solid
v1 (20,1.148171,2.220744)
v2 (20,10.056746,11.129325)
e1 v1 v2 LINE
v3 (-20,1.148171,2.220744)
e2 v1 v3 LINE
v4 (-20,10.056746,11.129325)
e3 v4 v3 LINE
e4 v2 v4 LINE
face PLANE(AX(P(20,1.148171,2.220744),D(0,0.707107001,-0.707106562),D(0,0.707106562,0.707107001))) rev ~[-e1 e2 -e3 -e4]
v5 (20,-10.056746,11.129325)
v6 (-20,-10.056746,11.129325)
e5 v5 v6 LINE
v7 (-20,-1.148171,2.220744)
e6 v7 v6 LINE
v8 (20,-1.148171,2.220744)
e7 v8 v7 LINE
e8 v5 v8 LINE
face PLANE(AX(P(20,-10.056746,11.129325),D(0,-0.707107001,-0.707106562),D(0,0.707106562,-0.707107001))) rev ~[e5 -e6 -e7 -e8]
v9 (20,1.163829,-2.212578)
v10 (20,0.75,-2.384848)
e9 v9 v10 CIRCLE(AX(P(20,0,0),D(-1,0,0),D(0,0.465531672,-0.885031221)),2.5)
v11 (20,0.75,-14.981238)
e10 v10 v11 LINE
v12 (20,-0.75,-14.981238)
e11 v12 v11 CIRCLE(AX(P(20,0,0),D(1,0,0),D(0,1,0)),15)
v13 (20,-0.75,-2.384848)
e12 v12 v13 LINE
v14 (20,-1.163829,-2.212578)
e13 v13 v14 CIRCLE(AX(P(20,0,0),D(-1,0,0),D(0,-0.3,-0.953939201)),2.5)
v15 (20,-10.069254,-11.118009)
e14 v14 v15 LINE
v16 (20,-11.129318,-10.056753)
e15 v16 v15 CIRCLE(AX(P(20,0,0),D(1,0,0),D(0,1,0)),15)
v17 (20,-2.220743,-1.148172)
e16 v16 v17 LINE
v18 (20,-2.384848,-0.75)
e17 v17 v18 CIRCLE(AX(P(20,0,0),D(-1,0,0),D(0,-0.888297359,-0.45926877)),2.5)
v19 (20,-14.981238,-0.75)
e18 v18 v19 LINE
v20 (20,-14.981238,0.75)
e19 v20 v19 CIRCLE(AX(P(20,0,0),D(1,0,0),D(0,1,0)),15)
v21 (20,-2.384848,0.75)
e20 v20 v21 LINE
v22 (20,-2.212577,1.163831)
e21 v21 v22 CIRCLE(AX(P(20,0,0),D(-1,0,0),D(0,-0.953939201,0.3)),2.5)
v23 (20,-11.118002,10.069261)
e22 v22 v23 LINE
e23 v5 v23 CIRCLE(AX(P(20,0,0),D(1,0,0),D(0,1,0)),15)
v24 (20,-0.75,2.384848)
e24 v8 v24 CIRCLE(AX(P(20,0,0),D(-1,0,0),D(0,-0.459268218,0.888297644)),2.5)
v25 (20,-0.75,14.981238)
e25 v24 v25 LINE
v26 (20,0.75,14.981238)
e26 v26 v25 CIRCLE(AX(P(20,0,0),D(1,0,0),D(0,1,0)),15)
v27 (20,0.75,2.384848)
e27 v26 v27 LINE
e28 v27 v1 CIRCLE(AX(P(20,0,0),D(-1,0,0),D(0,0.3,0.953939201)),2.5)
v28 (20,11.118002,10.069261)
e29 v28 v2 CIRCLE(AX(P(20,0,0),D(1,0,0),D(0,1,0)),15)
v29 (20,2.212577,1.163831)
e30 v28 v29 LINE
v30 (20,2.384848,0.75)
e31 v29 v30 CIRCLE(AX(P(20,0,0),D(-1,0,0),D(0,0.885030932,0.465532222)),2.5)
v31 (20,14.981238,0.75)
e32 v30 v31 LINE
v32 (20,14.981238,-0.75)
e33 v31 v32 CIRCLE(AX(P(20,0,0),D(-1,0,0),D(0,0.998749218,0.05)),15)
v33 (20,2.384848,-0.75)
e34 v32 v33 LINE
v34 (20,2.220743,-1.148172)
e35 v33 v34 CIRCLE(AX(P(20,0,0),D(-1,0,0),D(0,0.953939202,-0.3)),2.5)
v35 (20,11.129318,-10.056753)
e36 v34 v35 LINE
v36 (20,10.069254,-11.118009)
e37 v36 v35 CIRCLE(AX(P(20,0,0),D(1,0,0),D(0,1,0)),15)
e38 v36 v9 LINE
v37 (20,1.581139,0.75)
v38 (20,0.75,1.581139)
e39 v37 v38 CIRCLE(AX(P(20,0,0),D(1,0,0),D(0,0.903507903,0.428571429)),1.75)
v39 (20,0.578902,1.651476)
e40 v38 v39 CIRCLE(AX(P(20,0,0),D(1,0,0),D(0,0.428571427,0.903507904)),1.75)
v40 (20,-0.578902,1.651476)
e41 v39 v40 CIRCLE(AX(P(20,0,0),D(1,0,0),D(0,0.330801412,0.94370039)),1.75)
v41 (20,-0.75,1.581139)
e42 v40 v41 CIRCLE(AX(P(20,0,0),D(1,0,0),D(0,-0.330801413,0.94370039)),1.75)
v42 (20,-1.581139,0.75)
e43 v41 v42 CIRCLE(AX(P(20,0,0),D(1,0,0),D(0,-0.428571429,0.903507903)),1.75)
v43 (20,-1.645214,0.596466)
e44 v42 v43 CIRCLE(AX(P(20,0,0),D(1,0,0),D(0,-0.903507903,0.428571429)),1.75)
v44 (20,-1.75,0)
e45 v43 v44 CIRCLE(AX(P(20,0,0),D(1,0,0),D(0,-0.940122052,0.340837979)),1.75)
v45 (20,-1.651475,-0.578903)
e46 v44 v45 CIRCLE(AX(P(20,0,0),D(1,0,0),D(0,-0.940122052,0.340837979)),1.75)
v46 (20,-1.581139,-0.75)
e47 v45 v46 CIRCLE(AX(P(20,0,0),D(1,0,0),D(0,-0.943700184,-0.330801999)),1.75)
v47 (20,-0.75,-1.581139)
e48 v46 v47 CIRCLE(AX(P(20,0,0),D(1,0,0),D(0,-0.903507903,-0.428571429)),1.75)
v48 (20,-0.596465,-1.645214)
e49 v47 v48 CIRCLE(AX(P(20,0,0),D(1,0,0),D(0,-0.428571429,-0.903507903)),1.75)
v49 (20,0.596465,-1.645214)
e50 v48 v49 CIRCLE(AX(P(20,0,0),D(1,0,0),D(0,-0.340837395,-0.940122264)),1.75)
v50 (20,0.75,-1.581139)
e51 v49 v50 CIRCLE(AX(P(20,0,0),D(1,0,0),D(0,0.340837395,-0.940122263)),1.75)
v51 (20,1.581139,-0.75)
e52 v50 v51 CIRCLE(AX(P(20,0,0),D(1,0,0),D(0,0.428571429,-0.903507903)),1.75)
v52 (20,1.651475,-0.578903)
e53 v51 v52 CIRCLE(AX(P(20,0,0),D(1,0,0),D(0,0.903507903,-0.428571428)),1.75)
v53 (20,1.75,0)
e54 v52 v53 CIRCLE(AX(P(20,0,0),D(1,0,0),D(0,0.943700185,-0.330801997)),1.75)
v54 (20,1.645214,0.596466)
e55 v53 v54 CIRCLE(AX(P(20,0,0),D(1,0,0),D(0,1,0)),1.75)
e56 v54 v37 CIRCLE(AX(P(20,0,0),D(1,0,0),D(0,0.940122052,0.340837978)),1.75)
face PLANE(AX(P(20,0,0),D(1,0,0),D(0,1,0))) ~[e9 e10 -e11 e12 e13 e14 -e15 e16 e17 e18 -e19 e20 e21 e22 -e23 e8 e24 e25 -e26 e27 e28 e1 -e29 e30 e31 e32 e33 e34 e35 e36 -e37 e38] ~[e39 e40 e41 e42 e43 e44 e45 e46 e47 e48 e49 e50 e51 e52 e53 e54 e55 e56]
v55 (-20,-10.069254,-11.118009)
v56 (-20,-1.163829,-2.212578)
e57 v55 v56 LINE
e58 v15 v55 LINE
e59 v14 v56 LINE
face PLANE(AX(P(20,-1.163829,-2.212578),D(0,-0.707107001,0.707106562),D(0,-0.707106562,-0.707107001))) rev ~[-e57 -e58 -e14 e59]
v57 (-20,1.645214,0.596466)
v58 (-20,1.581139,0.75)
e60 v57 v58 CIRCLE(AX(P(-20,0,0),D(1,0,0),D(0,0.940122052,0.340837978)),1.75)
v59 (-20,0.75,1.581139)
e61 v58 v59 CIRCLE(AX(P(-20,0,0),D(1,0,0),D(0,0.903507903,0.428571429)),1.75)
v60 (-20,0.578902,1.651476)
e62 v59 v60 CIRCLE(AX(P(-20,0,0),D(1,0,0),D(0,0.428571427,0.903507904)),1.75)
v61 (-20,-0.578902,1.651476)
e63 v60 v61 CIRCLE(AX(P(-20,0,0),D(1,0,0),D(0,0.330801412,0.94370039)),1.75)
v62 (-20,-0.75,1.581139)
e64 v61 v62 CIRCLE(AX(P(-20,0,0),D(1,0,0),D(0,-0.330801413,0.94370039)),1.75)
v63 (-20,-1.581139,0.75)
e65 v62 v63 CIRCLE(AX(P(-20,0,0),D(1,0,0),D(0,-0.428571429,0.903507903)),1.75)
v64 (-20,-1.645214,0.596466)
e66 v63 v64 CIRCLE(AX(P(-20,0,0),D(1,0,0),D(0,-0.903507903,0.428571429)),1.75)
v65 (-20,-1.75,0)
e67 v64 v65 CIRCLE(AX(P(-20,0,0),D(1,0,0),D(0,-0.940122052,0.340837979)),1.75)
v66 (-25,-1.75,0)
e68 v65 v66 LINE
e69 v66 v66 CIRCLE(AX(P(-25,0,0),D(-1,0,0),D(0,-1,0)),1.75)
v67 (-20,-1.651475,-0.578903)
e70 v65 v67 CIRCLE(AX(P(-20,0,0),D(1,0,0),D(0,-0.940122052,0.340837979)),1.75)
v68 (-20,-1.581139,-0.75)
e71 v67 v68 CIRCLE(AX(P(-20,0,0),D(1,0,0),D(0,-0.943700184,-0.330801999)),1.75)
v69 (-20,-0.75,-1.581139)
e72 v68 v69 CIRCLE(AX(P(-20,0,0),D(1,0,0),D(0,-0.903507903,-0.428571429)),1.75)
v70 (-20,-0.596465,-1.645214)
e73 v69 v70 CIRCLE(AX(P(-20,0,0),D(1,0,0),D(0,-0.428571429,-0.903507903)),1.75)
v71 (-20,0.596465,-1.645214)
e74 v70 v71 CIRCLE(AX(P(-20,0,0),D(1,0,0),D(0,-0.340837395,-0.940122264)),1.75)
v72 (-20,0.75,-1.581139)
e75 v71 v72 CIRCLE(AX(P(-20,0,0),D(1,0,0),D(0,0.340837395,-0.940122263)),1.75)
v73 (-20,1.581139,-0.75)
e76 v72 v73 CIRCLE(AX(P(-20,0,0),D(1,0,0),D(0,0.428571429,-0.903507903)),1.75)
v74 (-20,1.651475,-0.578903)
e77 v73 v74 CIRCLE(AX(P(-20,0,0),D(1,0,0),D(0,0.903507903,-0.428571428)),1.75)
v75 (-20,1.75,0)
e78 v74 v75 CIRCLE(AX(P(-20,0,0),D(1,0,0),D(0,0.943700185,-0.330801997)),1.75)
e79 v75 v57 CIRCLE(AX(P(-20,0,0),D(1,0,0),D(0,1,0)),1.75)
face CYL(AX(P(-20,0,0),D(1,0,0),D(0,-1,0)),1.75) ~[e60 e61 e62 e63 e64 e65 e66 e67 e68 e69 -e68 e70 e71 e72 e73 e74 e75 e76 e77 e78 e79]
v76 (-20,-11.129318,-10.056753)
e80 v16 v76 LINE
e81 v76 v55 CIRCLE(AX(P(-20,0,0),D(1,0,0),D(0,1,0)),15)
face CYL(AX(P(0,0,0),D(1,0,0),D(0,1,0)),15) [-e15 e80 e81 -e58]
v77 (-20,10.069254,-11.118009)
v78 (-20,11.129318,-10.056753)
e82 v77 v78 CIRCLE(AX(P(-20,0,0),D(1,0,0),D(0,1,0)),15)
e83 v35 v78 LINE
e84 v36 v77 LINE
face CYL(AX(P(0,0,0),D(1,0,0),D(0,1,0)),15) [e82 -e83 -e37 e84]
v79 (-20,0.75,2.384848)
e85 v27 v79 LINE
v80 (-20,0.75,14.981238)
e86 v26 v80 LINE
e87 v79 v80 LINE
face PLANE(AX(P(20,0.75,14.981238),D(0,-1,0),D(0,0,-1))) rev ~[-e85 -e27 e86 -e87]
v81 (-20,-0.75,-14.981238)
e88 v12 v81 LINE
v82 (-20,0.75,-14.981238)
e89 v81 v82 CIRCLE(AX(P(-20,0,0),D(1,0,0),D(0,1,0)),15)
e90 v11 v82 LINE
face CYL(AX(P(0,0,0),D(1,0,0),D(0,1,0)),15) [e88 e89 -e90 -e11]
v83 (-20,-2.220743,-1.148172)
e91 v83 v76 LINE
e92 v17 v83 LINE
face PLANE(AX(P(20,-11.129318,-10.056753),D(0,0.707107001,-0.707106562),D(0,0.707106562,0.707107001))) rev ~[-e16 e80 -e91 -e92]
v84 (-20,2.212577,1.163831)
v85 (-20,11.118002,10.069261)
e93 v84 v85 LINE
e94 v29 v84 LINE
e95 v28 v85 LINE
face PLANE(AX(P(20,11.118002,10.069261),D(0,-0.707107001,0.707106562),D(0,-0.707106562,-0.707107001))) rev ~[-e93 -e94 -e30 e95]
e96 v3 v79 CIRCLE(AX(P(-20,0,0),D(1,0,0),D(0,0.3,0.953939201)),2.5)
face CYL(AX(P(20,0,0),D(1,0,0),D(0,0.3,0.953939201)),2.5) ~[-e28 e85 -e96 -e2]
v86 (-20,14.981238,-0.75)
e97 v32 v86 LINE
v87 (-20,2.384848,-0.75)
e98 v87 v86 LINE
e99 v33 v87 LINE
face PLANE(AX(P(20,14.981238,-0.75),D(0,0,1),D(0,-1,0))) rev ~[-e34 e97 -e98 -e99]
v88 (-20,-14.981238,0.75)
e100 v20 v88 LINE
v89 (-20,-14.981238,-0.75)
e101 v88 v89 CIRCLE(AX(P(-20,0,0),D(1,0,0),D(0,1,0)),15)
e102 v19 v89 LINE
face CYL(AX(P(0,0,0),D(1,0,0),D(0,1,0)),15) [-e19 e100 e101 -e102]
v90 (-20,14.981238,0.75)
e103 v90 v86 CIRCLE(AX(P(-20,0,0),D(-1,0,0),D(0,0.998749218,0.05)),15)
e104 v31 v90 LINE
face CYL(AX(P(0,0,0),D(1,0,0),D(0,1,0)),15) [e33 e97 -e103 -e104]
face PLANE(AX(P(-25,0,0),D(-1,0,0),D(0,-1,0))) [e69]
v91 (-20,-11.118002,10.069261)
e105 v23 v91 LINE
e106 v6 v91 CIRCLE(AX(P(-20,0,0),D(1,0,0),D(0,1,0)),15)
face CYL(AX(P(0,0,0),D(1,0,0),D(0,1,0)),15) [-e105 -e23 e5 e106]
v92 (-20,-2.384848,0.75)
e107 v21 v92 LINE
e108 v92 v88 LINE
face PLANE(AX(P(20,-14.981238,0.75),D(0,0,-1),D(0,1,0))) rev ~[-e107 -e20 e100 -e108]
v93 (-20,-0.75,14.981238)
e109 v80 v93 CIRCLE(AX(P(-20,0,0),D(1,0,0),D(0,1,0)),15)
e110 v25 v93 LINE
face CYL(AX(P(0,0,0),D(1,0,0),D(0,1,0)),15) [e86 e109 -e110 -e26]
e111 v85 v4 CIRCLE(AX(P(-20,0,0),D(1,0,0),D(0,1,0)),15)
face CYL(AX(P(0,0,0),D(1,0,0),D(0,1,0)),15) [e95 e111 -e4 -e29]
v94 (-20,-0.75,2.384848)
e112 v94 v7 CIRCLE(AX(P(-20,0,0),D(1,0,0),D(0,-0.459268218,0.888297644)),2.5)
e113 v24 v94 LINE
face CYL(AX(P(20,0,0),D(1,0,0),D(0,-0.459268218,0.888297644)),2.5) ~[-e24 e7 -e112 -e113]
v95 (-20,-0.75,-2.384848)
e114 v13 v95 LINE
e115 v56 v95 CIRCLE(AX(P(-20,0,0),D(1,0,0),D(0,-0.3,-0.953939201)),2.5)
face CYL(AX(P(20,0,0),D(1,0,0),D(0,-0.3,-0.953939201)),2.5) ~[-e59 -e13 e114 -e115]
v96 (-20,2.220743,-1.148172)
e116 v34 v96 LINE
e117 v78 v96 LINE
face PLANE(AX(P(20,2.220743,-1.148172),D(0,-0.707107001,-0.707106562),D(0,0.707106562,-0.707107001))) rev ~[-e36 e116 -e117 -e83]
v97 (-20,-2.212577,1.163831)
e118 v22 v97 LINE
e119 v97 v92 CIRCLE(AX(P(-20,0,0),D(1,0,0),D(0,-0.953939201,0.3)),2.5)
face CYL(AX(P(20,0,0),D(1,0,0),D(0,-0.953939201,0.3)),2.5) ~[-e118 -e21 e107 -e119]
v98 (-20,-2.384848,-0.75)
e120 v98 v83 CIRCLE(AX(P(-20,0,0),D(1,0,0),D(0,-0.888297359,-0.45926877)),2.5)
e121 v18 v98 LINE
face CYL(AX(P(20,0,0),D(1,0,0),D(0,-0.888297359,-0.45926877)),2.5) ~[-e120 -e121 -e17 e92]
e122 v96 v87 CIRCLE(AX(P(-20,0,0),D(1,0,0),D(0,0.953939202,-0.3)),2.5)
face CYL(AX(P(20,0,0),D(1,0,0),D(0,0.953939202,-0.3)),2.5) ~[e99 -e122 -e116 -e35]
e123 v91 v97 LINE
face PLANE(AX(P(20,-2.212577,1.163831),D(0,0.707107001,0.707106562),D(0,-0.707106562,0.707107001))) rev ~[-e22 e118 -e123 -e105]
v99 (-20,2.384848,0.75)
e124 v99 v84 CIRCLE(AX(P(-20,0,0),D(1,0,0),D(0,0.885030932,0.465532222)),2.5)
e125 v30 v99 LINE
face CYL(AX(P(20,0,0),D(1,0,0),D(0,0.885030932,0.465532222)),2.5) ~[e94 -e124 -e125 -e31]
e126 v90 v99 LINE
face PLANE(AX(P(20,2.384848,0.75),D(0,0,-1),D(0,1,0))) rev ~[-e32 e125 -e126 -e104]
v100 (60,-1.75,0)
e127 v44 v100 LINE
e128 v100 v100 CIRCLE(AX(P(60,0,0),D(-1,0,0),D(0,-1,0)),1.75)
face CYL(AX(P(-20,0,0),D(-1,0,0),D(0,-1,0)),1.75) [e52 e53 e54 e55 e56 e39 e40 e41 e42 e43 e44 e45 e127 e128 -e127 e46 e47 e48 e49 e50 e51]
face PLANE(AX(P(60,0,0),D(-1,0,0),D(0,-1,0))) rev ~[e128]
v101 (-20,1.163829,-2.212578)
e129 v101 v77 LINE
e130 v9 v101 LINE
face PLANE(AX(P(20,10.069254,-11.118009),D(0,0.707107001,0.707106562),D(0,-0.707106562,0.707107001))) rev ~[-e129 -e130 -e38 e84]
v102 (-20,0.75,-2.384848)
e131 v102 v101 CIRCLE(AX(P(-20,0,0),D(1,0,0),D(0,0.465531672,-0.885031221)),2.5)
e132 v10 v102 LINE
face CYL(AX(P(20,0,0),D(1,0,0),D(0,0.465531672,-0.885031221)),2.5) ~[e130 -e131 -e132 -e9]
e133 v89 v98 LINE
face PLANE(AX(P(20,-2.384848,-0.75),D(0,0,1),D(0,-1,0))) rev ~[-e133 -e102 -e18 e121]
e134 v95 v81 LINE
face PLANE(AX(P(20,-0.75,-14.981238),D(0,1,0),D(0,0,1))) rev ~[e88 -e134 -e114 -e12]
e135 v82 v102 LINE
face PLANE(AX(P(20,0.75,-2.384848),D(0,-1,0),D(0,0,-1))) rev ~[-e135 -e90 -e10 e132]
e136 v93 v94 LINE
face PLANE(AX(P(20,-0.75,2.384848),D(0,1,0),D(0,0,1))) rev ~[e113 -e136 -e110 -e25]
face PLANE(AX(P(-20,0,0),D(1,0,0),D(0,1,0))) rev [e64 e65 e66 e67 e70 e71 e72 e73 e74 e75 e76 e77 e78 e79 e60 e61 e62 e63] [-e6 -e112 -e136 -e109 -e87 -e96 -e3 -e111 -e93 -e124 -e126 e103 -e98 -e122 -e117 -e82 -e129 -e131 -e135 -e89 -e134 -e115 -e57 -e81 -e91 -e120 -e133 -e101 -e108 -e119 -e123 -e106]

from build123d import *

# Parameters (mm, degrees)
F0_W          = 40
F0_H          = 15
F3_DEPTH      = 40.001
F4_R          = 1.75
F4_R_2        = 0.75
F6_DEPTH      = 5
F6_DEPTH_BACK = 80


with BuildPart() as f1:
    # F0 (on Top) → F1 (revolve)
    with BuildSketch(Plane.XY):
        with Locations((0, 7.5)):
            Rectangle(F0_W, F0_H)
    revolve(axis=Axis((0, 0, 0), (1, 0, 0)))

    # F2 (on face) → F3 (cut, through all)
    with BuildSketch(Plane.YZ.offset(20)):
        with BuildLine():
            ThreePointArc((1.651475323, -0.578903496), (1.7251930059, -0.2936138491), (1.75, 0))
            ThreePointArc((1.75, 0), (1.7236043316, 0.3028004429), (1.6452135906, 0.5964664628))
            ThreePointArc((1.6452135906, 0.5964664628), (1.6150017407, 0.6739950872), (1.5811388301, 0.75))
            ThreePointArc((1.5811388301, 0.75), (1.2374368671, 1.2374368671), (0.75, 1.5811388301))
            ThreePointArc((0.75, 1.5811388301), (0.6653812907, 1.618569658), (0.5789024703, 1.6514756825))
            ThreePointArc((0.5789024703, 1.6514756825), (0, 1.75), (-0.5789024703, 1.6514756825))
            ThreePointArc((-0.5789024703, 1.6514756825), (-0.6653812907, 1.618569658), (-0.75, 1.5811388301))
            ThreePointArc((-0.75, 1.5811388301), (-1.2374368671, 1.2374368671), (-1.5811388301, 0.75))
            ThreePointArc((-1.5811388301, 0.75), (-1.6150017407, 0.6739950872), (-1.6452135906, 0.5964664628))
            ThreePointArc((-1.6452135906, 0.5964664628), (-1.7499751665, 0.0093229166), (-1.651475323, -0.578903496))
            ThreePointArc((-1.651475323, -0.578903496), (-1.6185694514, -0.6653817934), (-1.5811388301, -0.75))
            ThreePointArc((-1.5811388301, -0.75), (-1.2374368671, -1.2374368671), (-0.75, -1.5811388301))
            ThreePointArc((-0.75, -1.5811388301), (-0.6739945857, -1.61500195), (-0.596465441, -1.6452139611))
            ThreePointArc((-0.596465441, -1.6452139611), (0, -1.75), (0.596465441, -1.6452139611))
            ThreePointArc((0.596465441, -1.6452139611), (0.6739945857, -1.61500195), (0.75, -1.5811388301))
            ThreePointArc((0.75, -1.5811388301), (1.2374368671, -1.2374368671), (1.5811388301, -0.75))
            ThreePointArc((1.5811388301, -0.75), (1.6185694514, -0.6653817934), (1.651475323, -0.578903496))
        make_face()
        with BuildLine():
            ThreePointArc((2.2125773299, 1.1638305544), (2.3080064679, 0.9607841298), (2.3848480035, 0.75))
            Line((2.3848480035, 0.75), (14.9812382666, 0.75))
            ThreePointArc((14.9812382666, 0.75), (13.8565778233, 5.7441492866), (11.118002457, 10.0692612126))
            Line((11.118002457, 10.0692612126), (2.2125773299, 1.1638305544))
        make_face()
        with BuildLine():
            ThreePointArc((2.3848480035, -0.75), (2.3113855708, -0.9526262348), (2.2207433968, -1.1481719234))
            Line((2.2207433968, -1.1481719234), (11.1293184453, -10.0567525048))
            ThreePointArc((11.1293184453, -10.0567525048), (13.8598053196, -5.7363574246), (14.9812382666, -0.75))
            Line((14.9812382666, -0.75), (2.3848480035, -0.75))
        make_face()
        with BuildLine():
            ThreePointArc((0.75, 2.3848480035), (0.952625517, 2.3113858666), (1.1481705441, 2.2207441099))
            Line((1.1481705441, 2.2207441099), (10.0567455926, 11.1293246914))
            ThreePointArc((10.0567455926, 11.1293246914), (5.7363531205, 13.859807101), (0.75, 14.9812382666))
            Line((0.75, 14.9812382666), (0.75, 2.3848480035))
        make_face()
        with BuildLine():
            Line((10.0692543074, -11.1180087108), (1.1638291802, -2.2125780527))
            ThreePointArc((1.1638291802, -2.2125780527), (0.960783413, -2.3080067663), (0.75, -2.3848480035))
            Line((0.75, -2.3848480035), (0.75, -14.9812382666))
            ThreePointArc((0.75, -14.9812382666), (5.7441449835, -13.8565796071), (10.0692543074, -11.1180087108))
        make_face()
        with BuildLine():
            ThreePointArc((-1.1481705441, 2.2207441099), (-0.952625517, 2.3113858666), (-0.75, 2.3848480035))
            Line((-0.75, 2.3848480035), (-0.75, 14.9812382666))
            ThreePointArc((-0.75, 14.9812382666), (-5.7363531205, 13.859807101), (-10.0567455926, 11.1293246914))
            Line((-10.0567455926, 11.1293246914), (-1.1481705441, 2.2207441099))
        make_face()
        with BuildLine():
            Line((-0.75, -14.9812382666), (-0.75, -2.3848480035))
            ThreePointArc((-0.75, -2.3848480035), (-0.960783413, -2.3080067663), (-1.1638291802, -2.2125780527))
            Line((-1.1638291802, -2.2125780527), (-10.0692543074, -11.1180087108))
            ThreePointArc((-10.0692543074, -11.1180087108), (-5.7441449835, -13.8565796071), (-0.75, -14.9812382666))
        make_face()
        with BuildLine():
            ThreePointArc((-2.3848480035, 0.75), (-2.3080064679, 0.9607841298), (-2.2125773299, 1.1638305544))
            Line((-2.2125773299, 1.1638305544), (-11.118002457, 10.0692612126))
            ThreePointArc((-11.118002457, 10.0692612126), (-13.8565778233, 5.7441492866), (-14.9812382666, 0.75))
            Line((-14.9812382666, 0.75), (-2.3848480035, 0.75))
        make_face()
        with BuildLine():
            Line((-11.1293184453, -10.0567525048), (-2.2207433968, -1.1481719234))
            ThreePointArc((-2.2207433968, -1.1481719234), (-2.3113855708, -0.9526262348), (-2.3848480035, -0.75))
            Line((-2.3848480035, -0.75), (-14.9812382666, -0.75))
            ThreePointArc((-14.9812382666, -0.75), (-13.8598053196, -5.7363574246), (-11.1293184453, -10.0567525048))
        make_face()
    extrude(amount=-F3_DEPTH, mode=Mode.SUBTRACT)

    # F4 (on face) → F6 (join, two sides)
    with BuildSketch(Plane(origin=(-20, 0, 0), x_dir=(0, -1, 0), z_dir=(-1, 0, 0))) as f6_sk:
        Circle(F4_R)
        Circle(F4_R_2, mode=Mode.SUBTRACT)
        Circle(F4_R_2)
    extrude(amount=F6_DEPTH)
    extrude(f6_sk.sketch, amount=-F6_DEPTH_BACK)


solid = f1.part
